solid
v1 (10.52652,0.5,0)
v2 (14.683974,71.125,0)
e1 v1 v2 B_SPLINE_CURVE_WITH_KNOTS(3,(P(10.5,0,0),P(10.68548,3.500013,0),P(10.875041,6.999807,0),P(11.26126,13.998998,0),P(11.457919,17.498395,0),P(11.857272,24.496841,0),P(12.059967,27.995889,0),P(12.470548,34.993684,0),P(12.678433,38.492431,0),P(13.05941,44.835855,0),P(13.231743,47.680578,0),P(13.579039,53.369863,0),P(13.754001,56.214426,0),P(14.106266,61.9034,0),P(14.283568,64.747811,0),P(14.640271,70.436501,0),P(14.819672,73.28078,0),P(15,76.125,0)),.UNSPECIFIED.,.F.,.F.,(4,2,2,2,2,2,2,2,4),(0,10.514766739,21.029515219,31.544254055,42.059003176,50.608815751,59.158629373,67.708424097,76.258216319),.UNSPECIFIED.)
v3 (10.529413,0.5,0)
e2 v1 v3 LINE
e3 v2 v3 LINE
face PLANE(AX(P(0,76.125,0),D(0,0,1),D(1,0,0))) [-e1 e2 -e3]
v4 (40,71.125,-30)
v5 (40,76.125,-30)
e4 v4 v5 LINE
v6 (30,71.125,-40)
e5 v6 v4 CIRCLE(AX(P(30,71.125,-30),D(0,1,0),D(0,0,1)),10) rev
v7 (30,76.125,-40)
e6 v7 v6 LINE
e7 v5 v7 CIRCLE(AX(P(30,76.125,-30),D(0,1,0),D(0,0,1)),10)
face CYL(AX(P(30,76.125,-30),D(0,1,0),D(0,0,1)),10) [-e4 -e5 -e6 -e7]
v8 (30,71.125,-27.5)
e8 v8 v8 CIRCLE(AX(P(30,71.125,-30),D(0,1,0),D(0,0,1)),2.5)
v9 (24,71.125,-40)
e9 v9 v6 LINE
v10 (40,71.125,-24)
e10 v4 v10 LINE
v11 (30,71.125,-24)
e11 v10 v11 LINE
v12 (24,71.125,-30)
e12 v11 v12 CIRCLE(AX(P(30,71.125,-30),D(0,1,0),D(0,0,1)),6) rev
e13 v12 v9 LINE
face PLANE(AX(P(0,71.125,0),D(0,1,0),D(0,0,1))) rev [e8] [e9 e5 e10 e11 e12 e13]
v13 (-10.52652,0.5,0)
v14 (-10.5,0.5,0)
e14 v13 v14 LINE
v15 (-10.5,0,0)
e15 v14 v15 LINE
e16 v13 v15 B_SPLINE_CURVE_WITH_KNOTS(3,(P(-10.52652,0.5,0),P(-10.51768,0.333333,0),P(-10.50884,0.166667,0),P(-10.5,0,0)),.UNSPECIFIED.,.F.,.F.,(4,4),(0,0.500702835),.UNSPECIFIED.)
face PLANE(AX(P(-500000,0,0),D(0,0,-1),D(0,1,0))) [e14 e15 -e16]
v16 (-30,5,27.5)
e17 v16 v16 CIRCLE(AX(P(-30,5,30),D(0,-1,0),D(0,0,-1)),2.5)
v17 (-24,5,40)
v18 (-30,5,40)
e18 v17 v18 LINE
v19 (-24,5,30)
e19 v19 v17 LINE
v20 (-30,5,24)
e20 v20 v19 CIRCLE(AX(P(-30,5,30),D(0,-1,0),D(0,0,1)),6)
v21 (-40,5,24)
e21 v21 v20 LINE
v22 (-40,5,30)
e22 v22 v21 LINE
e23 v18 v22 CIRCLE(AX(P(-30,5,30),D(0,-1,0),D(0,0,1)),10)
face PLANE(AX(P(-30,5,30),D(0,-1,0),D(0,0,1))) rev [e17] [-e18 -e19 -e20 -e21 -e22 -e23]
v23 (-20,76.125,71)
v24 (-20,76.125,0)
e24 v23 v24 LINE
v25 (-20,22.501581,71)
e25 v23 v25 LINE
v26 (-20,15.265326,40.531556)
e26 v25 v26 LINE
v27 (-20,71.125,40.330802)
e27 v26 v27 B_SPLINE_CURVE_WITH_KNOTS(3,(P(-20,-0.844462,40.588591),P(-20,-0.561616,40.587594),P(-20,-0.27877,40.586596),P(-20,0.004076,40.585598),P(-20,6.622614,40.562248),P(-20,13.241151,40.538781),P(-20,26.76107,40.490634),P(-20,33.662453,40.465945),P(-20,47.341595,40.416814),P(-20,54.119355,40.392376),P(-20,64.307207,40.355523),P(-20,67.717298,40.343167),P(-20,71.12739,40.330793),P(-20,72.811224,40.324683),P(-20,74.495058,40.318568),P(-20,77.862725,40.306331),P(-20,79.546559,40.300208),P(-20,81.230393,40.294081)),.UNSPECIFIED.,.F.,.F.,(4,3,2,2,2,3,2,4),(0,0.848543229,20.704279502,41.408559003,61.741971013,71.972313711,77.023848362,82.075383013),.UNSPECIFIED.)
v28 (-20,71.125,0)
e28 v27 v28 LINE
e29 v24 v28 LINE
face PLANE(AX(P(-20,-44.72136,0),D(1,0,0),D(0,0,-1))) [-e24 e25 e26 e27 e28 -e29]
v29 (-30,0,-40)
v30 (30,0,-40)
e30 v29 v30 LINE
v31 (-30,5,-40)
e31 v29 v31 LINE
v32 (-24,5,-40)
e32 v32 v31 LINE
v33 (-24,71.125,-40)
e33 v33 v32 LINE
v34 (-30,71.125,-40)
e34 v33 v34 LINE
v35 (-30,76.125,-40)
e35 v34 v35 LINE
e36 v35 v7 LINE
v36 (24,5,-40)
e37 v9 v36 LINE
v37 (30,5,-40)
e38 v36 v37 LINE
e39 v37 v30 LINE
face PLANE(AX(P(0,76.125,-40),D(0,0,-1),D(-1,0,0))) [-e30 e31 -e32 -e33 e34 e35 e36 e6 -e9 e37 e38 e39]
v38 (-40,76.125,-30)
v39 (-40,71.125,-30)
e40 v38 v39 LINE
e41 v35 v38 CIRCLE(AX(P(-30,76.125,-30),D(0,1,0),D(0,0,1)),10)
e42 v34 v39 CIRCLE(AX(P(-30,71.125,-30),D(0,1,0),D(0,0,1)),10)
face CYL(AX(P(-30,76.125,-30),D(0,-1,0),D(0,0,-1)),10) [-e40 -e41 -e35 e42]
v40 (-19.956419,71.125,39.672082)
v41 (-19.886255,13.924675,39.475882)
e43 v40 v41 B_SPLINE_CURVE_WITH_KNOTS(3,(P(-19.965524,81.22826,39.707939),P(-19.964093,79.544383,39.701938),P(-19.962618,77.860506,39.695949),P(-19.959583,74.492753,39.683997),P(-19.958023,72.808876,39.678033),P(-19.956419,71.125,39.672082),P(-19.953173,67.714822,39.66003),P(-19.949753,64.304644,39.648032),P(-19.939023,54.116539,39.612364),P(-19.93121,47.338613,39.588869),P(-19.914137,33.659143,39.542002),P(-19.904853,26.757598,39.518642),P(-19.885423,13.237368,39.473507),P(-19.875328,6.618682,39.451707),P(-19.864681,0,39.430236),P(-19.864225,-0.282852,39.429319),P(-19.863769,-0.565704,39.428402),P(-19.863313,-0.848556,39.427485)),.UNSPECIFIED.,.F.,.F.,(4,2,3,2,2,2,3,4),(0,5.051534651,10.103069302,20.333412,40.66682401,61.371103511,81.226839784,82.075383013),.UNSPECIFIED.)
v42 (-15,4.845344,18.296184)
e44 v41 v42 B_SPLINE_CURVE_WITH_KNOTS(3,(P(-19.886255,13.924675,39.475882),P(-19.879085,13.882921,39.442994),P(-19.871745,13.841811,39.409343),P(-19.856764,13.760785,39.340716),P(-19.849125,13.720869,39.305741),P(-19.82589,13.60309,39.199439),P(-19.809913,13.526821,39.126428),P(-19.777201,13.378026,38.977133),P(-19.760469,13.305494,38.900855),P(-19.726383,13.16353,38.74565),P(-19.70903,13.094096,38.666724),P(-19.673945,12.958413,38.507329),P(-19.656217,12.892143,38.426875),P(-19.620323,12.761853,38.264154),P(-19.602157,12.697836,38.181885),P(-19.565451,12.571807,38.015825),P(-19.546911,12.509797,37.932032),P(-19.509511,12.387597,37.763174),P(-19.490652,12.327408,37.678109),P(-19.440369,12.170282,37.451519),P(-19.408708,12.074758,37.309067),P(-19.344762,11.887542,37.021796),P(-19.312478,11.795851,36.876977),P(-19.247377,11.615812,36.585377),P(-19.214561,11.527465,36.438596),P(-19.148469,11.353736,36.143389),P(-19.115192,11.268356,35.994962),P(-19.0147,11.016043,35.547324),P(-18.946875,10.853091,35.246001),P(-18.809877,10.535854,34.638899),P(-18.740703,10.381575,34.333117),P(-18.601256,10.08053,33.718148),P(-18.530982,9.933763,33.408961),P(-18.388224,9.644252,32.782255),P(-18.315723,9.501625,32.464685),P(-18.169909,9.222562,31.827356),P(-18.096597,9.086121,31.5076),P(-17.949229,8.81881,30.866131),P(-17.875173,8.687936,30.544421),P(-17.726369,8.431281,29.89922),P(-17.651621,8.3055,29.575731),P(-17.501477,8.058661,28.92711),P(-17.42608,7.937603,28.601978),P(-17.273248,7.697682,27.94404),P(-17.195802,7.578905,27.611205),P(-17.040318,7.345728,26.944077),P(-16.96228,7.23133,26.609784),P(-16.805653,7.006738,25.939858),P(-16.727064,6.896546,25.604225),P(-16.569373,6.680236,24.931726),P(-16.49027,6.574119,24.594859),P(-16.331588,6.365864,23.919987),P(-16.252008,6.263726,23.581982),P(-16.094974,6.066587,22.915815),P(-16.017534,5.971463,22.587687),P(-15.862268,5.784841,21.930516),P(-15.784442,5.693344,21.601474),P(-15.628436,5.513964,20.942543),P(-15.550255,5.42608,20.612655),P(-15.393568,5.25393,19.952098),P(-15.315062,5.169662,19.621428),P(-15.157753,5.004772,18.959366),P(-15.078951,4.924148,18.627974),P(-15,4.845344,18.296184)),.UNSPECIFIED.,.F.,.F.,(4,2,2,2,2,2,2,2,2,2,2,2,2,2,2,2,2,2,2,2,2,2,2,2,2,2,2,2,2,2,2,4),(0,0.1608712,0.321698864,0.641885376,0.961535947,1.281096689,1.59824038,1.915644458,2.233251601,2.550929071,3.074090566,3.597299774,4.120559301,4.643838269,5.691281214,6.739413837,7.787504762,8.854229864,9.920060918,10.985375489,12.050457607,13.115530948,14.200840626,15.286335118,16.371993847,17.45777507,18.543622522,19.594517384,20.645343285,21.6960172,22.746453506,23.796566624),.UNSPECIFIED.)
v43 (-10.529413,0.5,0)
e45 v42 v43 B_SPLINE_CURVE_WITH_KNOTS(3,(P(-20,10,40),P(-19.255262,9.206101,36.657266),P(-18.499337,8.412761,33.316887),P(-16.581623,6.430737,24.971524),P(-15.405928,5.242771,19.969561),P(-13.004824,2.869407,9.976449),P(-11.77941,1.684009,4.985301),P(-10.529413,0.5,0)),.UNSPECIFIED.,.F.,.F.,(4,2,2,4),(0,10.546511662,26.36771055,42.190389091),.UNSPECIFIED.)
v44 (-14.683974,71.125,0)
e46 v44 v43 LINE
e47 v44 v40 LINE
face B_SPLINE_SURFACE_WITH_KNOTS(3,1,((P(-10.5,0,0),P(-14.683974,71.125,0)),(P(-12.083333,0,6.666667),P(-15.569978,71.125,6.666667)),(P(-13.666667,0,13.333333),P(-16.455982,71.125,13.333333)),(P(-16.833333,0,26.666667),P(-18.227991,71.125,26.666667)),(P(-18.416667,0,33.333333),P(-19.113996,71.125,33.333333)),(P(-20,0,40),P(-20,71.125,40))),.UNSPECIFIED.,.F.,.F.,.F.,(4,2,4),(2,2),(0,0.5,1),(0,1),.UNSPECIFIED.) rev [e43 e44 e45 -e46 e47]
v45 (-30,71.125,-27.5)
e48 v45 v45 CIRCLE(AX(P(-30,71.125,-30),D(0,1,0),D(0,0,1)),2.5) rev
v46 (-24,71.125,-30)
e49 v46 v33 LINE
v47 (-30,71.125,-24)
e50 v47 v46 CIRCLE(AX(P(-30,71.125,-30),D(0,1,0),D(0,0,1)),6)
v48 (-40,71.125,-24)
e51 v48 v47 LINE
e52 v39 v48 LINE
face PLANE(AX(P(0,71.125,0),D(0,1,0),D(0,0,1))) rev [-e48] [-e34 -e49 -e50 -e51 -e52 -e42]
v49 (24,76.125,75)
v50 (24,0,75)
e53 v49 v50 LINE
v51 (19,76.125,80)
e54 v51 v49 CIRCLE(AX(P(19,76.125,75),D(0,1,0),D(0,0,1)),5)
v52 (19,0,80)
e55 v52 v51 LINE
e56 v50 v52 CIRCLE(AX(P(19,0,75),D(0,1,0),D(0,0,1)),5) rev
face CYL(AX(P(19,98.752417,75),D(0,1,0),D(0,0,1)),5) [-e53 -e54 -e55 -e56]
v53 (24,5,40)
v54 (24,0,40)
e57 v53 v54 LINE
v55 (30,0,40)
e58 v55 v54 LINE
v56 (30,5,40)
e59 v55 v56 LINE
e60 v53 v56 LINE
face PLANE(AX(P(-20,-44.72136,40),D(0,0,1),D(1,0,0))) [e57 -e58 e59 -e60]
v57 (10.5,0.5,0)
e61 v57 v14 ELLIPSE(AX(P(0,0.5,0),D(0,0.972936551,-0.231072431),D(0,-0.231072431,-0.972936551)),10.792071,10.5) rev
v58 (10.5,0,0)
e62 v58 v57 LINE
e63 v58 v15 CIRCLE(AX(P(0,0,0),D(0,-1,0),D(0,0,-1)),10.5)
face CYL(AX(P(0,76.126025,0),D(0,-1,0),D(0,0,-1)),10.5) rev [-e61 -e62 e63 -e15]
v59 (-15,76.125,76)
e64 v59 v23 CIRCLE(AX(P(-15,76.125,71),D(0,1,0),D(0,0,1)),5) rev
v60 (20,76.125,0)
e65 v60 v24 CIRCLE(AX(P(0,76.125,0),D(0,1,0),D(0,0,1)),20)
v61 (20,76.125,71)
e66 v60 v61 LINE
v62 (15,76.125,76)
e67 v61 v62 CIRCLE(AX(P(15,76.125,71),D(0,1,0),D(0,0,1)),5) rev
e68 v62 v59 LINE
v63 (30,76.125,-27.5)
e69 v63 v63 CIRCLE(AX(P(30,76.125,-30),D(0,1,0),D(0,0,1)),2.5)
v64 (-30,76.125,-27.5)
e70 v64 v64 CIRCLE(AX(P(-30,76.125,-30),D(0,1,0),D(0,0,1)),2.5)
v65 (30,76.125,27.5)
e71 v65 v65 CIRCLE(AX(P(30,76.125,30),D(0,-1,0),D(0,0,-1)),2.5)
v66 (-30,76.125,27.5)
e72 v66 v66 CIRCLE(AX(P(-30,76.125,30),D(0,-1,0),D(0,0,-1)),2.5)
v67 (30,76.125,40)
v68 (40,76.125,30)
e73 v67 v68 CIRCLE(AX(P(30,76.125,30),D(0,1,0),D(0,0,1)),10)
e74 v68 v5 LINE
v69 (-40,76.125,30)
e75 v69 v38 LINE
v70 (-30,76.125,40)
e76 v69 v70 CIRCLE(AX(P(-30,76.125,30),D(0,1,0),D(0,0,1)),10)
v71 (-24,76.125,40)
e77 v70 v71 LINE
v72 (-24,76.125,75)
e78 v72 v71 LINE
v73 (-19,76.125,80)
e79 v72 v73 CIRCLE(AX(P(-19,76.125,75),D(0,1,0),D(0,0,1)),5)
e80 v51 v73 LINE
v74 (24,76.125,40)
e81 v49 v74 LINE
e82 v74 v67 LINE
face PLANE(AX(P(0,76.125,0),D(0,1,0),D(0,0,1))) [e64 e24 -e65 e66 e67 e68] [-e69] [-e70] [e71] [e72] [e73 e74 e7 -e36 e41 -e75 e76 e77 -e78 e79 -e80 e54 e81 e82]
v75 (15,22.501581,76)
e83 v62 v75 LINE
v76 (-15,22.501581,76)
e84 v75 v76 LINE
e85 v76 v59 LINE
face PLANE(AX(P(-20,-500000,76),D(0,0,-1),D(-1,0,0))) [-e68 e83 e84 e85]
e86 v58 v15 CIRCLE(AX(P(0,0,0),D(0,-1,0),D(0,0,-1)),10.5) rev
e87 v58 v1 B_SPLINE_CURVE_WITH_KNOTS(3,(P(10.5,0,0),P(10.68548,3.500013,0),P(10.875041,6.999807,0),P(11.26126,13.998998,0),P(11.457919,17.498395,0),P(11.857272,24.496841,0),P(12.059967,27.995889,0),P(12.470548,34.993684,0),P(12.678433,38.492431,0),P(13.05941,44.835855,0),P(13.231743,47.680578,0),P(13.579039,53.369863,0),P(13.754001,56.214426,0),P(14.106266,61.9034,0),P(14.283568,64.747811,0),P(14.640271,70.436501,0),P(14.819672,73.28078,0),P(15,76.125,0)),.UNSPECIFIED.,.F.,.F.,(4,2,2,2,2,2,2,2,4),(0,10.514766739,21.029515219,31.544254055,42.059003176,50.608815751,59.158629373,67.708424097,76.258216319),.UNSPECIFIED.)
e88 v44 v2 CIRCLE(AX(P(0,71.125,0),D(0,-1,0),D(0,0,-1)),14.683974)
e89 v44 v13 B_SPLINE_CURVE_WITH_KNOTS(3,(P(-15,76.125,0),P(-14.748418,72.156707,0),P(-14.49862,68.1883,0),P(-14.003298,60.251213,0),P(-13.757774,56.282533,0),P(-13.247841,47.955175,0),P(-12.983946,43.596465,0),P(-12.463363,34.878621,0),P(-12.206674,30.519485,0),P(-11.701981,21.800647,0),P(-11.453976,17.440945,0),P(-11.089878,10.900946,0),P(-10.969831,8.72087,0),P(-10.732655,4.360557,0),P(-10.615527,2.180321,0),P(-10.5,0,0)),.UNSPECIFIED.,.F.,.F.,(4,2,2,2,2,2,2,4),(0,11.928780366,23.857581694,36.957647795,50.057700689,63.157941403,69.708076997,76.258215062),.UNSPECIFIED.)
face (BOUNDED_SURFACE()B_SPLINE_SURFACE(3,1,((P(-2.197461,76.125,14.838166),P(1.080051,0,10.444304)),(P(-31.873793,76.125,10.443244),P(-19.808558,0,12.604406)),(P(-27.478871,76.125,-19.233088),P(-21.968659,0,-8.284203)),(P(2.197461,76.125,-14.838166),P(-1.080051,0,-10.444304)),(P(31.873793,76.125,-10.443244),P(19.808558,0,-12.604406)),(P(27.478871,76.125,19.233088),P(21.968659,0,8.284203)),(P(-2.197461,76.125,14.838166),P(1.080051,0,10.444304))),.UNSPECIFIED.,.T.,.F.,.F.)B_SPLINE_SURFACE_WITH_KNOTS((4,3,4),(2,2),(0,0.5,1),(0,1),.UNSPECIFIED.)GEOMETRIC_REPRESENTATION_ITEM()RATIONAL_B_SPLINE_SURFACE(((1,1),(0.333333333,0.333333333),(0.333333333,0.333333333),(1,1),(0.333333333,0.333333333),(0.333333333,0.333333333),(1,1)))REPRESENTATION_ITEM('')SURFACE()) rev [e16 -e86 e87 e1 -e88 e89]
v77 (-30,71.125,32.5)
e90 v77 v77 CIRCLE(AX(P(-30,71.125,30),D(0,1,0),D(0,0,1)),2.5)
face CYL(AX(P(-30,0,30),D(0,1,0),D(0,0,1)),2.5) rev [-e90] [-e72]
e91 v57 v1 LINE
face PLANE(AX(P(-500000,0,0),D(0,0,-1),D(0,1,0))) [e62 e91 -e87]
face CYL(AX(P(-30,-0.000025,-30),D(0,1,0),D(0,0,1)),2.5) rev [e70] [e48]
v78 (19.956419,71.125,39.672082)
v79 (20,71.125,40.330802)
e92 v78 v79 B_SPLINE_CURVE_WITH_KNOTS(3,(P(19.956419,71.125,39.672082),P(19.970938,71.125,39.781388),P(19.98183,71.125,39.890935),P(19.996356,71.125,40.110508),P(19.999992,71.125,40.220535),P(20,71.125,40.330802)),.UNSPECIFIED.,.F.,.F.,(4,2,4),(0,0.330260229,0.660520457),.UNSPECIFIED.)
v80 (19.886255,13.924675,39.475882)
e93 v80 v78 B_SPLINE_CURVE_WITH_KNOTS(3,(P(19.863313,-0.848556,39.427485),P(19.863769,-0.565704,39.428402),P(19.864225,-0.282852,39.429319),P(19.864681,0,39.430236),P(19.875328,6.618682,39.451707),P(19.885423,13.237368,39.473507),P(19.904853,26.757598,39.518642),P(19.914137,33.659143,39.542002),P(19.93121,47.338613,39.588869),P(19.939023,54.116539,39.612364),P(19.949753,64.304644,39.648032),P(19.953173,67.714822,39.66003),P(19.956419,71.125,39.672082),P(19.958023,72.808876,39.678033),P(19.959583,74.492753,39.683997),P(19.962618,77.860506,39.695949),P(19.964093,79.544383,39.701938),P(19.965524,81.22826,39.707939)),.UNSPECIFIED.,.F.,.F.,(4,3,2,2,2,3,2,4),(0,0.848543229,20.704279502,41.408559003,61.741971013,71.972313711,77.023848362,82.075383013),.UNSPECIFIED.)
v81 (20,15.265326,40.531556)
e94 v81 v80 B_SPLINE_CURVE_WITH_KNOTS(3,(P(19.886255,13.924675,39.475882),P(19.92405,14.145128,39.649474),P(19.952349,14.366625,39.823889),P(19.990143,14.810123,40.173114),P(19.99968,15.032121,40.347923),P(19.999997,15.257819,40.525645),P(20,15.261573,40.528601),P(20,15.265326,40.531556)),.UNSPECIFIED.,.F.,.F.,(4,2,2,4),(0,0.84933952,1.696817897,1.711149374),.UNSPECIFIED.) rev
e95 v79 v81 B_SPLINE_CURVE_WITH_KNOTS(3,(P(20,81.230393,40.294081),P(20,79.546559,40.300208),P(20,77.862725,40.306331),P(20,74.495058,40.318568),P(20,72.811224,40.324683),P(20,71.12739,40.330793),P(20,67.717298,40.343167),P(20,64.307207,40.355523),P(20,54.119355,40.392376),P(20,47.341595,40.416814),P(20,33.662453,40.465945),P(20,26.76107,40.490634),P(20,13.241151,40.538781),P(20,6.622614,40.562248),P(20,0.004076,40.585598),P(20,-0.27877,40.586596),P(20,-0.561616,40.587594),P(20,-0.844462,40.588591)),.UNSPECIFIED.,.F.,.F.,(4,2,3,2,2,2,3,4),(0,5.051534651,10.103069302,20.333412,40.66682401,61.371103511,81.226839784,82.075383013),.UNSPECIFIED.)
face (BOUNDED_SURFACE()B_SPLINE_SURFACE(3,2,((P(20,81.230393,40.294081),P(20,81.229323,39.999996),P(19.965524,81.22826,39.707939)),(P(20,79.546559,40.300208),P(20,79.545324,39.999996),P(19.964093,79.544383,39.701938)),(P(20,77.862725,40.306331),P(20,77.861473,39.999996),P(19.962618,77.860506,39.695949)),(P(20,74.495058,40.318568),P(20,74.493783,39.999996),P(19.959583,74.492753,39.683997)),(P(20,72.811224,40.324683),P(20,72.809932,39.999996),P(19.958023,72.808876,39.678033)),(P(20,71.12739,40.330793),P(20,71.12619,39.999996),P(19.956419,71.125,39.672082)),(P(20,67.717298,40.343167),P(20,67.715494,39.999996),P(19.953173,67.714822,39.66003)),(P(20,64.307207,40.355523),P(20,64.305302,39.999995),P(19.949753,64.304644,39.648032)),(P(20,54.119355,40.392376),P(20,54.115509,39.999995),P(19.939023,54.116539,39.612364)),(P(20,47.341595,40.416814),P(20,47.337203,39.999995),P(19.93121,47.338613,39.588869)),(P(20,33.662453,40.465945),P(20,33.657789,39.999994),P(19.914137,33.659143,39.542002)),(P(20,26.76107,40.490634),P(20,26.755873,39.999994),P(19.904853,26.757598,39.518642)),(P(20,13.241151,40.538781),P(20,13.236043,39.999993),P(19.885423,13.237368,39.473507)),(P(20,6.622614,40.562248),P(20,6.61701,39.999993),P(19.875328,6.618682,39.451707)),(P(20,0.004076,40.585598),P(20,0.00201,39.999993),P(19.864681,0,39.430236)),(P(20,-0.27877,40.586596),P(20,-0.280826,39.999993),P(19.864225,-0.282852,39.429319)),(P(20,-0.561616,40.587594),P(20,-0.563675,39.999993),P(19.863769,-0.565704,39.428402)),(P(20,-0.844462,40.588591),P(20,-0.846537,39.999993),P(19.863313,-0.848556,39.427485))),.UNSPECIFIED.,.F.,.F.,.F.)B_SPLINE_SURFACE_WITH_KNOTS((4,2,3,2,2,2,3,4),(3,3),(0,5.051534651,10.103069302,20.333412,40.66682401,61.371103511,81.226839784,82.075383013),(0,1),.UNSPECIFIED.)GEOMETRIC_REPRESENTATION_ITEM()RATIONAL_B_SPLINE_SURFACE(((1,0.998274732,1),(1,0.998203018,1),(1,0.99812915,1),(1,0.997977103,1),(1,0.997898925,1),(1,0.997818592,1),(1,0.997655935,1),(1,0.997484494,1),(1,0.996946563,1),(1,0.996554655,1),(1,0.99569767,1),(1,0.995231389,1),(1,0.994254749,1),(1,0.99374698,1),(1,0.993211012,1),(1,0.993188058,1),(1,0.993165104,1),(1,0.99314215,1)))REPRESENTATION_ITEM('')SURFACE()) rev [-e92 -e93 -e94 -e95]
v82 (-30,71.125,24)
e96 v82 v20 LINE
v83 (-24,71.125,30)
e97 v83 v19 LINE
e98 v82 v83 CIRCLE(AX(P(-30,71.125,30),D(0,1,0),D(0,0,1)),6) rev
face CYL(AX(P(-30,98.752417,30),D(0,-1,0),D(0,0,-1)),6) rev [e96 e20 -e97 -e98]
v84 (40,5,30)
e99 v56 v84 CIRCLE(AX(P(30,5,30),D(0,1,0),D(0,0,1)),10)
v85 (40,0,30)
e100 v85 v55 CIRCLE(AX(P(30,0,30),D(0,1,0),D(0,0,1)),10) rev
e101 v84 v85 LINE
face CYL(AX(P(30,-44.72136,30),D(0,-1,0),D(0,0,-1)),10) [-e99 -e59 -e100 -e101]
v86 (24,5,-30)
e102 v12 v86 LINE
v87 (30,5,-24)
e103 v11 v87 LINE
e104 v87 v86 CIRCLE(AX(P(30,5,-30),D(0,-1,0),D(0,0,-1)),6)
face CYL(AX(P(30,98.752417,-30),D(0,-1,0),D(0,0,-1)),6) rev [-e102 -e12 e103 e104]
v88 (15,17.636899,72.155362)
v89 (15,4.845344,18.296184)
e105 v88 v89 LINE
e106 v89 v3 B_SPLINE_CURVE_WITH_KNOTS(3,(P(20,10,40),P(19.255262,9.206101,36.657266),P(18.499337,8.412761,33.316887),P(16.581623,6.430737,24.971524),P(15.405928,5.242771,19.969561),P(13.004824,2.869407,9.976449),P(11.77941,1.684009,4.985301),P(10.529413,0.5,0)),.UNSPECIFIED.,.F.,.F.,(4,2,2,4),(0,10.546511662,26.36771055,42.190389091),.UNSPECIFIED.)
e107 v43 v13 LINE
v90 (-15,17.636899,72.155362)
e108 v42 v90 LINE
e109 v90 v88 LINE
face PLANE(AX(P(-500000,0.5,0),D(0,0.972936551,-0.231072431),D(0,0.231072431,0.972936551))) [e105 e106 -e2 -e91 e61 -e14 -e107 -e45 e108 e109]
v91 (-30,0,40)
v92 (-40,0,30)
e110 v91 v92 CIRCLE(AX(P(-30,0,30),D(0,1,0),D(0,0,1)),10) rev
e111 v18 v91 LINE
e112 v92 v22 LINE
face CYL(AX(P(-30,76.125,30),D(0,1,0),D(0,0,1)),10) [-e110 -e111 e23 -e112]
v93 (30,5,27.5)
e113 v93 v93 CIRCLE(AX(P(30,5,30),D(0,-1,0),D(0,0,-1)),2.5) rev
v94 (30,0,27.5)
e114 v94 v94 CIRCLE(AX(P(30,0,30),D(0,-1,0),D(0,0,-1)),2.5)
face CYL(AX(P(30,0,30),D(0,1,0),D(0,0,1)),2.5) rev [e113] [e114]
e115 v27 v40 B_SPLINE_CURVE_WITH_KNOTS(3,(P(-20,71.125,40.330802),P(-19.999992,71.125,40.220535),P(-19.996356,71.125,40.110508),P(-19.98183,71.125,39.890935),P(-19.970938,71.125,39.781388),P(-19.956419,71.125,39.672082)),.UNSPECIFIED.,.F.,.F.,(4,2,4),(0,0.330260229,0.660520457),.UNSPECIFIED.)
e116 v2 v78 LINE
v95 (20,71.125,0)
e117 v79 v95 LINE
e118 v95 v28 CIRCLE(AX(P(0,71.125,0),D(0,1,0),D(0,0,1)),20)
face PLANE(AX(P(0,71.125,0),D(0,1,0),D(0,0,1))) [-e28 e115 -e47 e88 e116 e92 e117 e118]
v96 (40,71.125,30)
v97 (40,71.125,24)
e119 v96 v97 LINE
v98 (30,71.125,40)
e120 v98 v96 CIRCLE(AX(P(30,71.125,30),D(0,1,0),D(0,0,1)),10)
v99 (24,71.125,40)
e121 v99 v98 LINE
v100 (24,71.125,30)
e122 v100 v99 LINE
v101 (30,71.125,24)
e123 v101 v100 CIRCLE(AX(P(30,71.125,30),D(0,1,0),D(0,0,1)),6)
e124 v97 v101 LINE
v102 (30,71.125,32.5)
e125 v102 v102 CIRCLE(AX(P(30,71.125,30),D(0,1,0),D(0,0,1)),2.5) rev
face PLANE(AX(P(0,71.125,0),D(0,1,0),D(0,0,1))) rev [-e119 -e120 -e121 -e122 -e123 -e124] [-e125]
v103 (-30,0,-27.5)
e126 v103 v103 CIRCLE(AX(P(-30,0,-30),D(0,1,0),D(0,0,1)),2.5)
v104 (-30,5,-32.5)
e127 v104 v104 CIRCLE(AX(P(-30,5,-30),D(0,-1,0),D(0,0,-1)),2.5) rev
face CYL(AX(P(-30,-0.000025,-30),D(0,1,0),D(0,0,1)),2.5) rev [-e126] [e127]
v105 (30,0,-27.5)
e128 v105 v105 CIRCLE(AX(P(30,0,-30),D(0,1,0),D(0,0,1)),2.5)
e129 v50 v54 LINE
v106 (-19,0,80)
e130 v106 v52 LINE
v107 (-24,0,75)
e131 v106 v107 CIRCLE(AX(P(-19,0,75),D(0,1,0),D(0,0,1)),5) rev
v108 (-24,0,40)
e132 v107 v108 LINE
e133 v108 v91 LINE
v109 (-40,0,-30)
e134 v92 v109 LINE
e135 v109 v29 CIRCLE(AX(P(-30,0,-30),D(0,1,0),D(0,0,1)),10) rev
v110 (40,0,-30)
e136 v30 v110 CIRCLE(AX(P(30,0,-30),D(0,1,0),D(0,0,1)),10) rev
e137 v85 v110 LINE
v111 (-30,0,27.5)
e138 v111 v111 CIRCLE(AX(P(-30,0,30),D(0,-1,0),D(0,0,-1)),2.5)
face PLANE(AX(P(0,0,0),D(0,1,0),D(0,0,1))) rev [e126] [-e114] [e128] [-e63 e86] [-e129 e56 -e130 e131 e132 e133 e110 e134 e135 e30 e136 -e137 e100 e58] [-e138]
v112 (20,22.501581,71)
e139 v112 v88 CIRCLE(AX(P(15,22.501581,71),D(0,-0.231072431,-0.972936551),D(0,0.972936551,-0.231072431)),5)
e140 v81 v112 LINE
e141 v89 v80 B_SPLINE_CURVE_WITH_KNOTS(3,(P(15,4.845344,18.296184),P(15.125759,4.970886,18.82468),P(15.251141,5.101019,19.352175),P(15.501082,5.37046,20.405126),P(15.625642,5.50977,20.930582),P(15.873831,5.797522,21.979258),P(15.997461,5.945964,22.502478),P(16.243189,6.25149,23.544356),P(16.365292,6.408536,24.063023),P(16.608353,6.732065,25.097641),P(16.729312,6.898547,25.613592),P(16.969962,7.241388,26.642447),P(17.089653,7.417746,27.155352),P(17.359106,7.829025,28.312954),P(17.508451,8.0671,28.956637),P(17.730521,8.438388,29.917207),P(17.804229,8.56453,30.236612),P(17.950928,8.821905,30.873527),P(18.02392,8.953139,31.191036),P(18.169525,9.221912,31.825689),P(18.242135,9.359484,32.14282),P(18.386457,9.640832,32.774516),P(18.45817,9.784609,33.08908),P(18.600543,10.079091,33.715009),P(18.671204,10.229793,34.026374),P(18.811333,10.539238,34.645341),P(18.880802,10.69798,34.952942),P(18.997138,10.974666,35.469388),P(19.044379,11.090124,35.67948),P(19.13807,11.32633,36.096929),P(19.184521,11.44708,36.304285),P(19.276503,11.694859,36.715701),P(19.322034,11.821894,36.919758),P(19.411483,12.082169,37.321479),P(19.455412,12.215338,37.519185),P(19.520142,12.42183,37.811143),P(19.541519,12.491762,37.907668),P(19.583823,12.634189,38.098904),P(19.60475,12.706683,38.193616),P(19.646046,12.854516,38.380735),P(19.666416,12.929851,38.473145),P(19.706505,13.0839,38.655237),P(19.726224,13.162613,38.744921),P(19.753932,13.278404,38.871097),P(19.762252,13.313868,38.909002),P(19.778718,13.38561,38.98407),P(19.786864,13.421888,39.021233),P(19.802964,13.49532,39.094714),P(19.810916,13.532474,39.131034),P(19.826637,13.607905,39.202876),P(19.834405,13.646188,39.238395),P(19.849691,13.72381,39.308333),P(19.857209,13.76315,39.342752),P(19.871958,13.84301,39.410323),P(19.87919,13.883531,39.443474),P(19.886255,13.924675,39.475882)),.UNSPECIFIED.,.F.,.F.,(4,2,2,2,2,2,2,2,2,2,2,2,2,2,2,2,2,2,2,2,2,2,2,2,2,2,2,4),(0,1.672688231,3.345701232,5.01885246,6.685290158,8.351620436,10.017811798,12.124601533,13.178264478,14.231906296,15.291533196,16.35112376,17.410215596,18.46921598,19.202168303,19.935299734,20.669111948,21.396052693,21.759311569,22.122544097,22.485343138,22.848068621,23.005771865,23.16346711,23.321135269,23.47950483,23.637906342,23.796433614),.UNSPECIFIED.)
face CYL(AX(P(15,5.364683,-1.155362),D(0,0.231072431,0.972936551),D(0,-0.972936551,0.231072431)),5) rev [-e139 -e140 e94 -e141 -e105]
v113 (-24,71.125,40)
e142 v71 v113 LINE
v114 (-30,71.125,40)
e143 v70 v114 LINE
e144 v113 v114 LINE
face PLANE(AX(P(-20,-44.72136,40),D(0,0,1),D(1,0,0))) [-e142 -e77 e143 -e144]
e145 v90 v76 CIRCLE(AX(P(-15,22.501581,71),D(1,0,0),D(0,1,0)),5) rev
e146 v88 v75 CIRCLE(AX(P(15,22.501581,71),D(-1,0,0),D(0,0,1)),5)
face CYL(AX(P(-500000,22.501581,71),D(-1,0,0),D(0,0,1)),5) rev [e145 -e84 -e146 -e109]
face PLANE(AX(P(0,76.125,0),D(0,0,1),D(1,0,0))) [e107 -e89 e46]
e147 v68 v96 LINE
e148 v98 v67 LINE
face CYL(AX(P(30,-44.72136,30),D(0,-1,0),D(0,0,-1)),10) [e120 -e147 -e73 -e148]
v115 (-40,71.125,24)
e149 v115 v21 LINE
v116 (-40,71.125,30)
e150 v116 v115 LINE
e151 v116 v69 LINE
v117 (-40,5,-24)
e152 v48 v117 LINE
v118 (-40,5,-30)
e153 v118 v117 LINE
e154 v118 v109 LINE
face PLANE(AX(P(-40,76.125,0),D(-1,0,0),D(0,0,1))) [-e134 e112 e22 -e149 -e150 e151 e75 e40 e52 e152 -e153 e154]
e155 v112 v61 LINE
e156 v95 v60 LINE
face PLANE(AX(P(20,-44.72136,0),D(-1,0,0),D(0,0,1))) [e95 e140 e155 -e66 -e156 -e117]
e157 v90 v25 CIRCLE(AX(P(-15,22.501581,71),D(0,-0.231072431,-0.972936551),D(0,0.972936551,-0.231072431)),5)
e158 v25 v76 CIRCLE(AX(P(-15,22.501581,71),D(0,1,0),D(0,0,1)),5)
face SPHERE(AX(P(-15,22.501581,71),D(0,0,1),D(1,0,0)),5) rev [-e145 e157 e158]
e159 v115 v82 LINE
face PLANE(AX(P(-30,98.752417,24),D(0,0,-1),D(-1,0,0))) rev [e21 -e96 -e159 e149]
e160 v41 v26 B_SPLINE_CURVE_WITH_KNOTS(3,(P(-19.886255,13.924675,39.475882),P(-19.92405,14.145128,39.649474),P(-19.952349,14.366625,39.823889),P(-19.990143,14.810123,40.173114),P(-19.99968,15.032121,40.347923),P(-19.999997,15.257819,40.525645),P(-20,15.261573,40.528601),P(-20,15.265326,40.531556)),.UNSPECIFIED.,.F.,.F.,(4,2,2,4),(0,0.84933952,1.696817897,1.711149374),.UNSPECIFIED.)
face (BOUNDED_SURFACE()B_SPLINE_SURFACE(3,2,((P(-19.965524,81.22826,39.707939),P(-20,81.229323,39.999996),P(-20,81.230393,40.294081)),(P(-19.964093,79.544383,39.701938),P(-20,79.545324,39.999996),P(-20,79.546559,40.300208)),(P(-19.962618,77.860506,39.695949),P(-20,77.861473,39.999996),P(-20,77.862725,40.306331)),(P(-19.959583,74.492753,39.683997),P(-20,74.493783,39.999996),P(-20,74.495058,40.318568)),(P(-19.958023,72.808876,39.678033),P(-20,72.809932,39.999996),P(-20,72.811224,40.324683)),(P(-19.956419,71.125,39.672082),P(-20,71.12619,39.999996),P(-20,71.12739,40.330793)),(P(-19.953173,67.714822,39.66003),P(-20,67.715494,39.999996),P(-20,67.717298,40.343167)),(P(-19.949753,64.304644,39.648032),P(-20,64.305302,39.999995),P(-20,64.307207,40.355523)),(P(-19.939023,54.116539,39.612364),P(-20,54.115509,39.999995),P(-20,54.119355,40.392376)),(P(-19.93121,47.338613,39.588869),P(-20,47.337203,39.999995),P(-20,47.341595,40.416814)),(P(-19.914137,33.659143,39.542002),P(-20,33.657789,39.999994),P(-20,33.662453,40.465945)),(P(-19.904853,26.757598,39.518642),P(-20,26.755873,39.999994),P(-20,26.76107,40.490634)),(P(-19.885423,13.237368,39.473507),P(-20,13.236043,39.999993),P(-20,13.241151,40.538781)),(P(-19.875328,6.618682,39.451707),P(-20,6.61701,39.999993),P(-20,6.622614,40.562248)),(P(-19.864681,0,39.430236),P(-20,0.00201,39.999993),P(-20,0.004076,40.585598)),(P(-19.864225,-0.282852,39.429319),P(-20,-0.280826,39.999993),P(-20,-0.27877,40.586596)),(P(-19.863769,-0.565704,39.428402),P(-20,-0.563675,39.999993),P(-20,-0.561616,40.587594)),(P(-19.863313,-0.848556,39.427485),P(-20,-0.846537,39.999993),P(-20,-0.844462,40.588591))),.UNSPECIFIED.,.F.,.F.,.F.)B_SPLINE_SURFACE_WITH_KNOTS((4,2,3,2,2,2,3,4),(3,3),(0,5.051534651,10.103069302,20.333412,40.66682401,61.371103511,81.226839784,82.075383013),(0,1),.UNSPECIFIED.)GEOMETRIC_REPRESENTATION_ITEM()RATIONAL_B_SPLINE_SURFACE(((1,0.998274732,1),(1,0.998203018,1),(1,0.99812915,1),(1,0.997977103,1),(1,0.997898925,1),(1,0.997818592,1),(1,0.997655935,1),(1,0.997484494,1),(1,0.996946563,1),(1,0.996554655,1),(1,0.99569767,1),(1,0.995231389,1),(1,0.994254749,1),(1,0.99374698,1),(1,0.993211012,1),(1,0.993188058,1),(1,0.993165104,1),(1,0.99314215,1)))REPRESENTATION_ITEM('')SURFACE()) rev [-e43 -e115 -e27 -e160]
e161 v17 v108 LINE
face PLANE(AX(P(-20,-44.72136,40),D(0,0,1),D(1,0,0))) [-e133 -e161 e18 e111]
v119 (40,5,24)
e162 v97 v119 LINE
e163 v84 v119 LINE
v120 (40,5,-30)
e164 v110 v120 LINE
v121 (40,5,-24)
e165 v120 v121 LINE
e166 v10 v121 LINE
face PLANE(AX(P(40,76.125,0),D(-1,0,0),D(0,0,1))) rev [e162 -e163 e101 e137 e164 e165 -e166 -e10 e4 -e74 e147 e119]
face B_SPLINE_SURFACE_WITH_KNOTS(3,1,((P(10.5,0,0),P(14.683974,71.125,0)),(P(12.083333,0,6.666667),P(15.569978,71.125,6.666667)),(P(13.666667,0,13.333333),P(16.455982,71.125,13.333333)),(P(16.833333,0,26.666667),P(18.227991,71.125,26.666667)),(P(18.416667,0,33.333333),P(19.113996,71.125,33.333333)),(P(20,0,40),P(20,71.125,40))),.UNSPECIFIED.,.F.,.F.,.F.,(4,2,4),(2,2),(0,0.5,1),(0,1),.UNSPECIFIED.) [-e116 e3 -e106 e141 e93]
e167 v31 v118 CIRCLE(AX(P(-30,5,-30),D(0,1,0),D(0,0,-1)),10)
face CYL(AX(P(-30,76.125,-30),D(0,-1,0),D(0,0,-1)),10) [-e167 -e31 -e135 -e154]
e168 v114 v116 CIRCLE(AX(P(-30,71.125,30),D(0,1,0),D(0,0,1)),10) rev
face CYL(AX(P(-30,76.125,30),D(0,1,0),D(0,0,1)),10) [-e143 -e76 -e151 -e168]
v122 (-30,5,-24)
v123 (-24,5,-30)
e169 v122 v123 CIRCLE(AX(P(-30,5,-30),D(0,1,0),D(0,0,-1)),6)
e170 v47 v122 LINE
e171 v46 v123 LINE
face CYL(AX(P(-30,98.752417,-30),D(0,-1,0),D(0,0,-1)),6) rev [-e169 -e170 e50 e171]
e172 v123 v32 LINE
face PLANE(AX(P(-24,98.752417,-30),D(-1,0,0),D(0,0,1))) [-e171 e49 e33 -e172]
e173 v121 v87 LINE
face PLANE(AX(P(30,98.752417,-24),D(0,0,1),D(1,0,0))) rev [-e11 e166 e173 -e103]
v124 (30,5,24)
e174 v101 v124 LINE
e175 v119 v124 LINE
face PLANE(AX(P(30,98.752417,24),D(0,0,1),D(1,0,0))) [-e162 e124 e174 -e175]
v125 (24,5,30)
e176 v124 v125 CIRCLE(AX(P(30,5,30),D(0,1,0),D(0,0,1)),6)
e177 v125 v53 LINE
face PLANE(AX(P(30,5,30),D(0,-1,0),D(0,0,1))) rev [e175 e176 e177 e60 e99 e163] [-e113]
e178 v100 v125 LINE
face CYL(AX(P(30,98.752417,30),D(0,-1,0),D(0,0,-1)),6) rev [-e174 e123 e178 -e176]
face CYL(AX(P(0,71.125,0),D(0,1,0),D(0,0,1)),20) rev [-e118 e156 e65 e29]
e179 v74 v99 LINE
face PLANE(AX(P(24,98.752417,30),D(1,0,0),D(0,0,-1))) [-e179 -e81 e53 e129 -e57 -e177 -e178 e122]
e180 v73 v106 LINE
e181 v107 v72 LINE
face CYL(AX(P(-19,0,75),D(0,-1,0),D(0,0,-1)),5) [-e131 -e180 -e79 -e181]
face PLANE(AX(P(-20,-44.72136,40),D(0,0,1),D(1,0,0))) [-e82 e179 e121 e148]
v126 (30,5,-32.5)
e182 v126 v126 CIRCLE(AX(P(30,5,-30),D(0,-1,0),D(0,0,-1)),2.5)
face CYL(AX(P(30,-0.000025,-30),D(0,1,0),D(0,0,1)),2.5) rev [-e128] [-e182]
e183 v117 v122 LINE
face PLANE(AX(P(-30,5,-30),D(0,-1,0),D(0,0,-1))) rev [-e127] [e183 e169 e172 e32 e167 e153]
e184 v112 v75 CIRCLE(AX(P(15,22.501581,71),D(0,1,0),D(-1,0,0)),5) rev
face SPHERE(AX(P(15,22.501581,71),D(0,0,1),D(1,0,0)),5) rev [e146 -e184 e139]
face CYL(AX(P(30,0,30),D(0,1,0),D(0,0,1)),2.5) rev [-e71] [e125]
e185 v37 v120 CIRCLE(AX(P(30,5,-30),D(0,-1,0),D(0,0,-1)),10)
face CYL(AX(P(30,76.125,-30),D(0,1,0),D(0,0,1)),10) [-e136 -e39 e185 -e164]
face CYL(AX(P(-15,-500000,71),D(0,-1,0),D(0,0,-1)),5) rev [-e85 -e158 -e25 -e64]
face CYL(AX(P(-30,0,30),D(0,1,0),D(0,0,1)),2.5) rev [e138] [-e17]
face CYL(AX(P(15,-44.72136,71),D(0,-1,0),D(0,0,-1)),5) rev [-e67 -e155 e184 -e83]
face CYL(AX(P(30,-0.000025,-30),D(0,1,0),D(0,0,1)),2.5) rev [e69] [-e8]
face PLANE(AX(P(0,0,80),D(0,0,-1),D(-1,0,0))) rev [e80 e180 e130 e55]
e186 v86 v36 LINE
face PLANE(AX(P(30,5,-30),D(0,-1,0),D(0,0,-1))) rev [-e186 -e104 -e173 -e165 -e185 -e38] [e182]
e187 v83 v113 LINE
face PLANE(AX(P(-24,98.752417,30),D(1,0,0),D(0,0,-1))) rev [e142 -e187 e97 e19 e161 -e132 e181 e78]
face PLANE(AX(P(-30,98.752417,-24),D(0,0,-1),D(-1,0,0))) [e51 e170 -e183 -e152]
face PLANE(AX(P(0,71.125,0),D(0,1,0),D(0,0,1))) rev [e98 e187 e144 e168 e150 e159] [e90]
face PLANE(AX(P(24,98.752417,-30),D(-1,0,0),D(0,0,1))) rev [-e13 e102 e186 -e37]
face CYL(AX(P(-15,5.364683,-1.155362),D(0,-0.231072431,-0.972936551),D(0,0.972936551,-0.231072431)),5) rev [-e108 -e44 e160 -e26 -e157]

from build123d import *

# Parameters (mm, degrees)
SKETCH1_W                       = 80
SKETCH1_H                       = 40
BOSS_EXTRUDE1_DEPTH             = 76.125
FILLET1_R                       = 10
CUT_EXTRUDE1_START              = -66.125
CUT_EXTRUDE1_DEPTH              = 66.125
SKETCH5_R                       = 2.5
CUT_EXTRUDE2_DEPTH              = 95.842056369
SKETCH6_R                       = 20
CUT_EXTRUDE3_DEPTH              = 5
SKETCH7_W                       = 20
SKETCH7_H                       = 40
BOSS_EXTRUDE3_DEPTH             = 76.125
FILLET2_R                       = 10
MIRROR2_START                   = -66.125
MIRROR2_COPY_1_DEPTH            = 66.125
BOSS_EXTRUDE4_REACH             = 96.842
BOSS_EXTRUDE4_DIRECTION_2_REACH = 96.842
CUT_EXTRUDE4_REACH              = 96.842
SKETCH12_R                      = 10.5
SKETCH13_W                      = 4
SKETCH13_H                      = 76.125
BOSS_EXTRUDE5_DEPTH             = 40
BOSS_EXTRUDE6_REACH             = 127.678
BOSS_EXTRUDE7_REACH             = 119.452
SKETCH15_W                      = 40
SKETCH15_H                      = 4
FILLET3_R                       = 5


with BuildPart() as part:
    # Sketch1 → Boss-Extrude1 (new body)
    with BuildSketch(Plane(origin=(0, 0, 0), x_dir=(1, 0, 0), z_dir=(0, 1, 0))):
        with Locations((0, 20)):
            Rectangle(SKETCH1_W, SKETCH1_H)
    extrude(amount=BOSS_EXTRUDE1_DEPTH)

    # Cut-Loft1: read off the stored shape, not the designer's step
    # Cut-Loft1: loft between two sections, ruled curve by curve
    cut_loft1_from = [
        Edge.make_bspline([(-2.197461017, 76.125, 14.838165826), (-31.873792669, 76.125, 10.443243791), (-27.478870634, 76.125, -19.233087861), (2.197461017, 76.125, -14.838165826), (31.873792669, 76.125, -10.443243791), (27.478870634, 76.125, 19.233087861), (-2.197461017, 76.125, 14.838165826)], [0, 0, 0, 0, 0.5, 0.5, 0.5, 1, 1, 1, 1], 3, [1, 0.333333333, 0.333333333, 1, 0.333333333, 0.333333333, 1]),
    ]
    cut_loft1_to = [
        Edge.make_bspline([(1.080050789, 0, 10.444304203), (-19.808557618, 0, 12.604405781), (-21.968659196, 0, -8.284202626), (-1.080050789, 0, -10.444304203), (19.808557618, 0, -12.604405781), (21.968659196, 0, 8.284202626), (1.080050789, 0, 10.444304203)], [0, 0, 0, 0, 0.5, 0.5, 0.5, 1, 1, 1, 1], 3, [1, 0.333333333, 0.333333333, 1, 0.333333333, 0.333333333, 1]),
    ]
    cut_loft1 = Solid(Shell([*[Face.make_surface_from_curves(cut_loft1_from[k], cut_loft1_to[k]) for k in range(1)], Face(Wire(cut_loft1_from)), Face(Wire(cut_loft1_to))]))
    add(cut_loft1, mode=Mode.SUBTRACT)

    # Fillet1
    fillet1_edges = [part.edges().sort_by_distance(p)[0] for p in [
        (-40, 38.0625, -40),
        (40, 38.0625, -40),
    ]]
    fillet(fillet1_edges, radius=FILLET1_R)

    # Sketch4 → Cut-Extrude1 (cut)
    with BuildSketch(Plane(origin=(0, 5, 0), x_dir=(-1, 0, 0), z_dir=(0, -1, 0)).offset(CUT_EXTRUDE1_START)):
        with BuildLine():
            Line((-40, 24), (-40, 30))
            ThreePointArc((-40, 30), (-37.071067812, 37.071067812), (-30, 40))
            Line((-30, 40), (-24, 40))
            Line((-24, 40), (-24, 30))
            ThreePointArc((-24, 30), (-25.757359313, 25.757359313), (-30, 24))
            Line((-30, 24), (-40, 24))
        make_face()
    cut_extrude1 = extrude(amount=CUT_EXTRUDE1_DEPTH, mode=Mode.SUBTRACT)

    # Sketch5 → Cut-Extrude2 (cut, through all)
    with BuildSketch(Plane(origin=(0, 76.125, 0), x_dir=(1, 0, 0), z_dir=(0, 1, 0))):
        with Locations(Location((30, 30, 0), (0, 0, 270))):
            Circle(SKETCH5_R)
        with Locations(Location((-30, 30, 0), (0, 0, 270))):
            Circle(SKETCH5_R)
    cut_extrude2 = extrude(amount=-CUT_EXTRUDE2_DEPTH, mode=Mode.SUBTRACT)

    # Sketch6 → Cut-Extrude3 (cut)
    with BuildSketch(Plane(origin=(0, 76.125, 0), x_dir=(1, 0, 0), z_dir=(0, 1, 0))):
        Circle(SKETCH6_R)
    extrude(amount=-CUT_EXTRUDE3_DEPTH, mode=Mode.SUBTRACT)

    # Mirror1: Cut-Extrude1 across plane
    add(cut_extrude1.mirror(Plane(origin=(0, 0, 0), x_dir=(0, 0, 1), z_dir=(1, 0, 0))), mode=Mode.SUBTRACT)

    # Sketch7 → Boss-Extrude3 (add)
    with BuildSketch(Plane(origin=(0, 76.125, 0), x_dir=(1, 0, 0), z_dir=(0, 1, 0))):
        with Locations((-30, -20)):
            Rectangle(SKETCH7_W, SKETCH7_H)
        with Locations((30, -20)):
            Rectangle(SKETCH7_W, SKETCH7_H)
    extrude(amount=-BOSS_EXTRUDE3_DEPTH)

    # Fillet2
    fillet2_edges = [part.edges().sort_by_distance(p)[0] for p in [
        (-40, 38.0625, 40),
        (40, 38.0625, 40),
    ]]
    fillet(fillet2_edges, radius=FILLET2_R)

    # Mirror2: Cut-Extrude1, Cut-Extrude2 across plane
    add(cut_extrude1.mirror(Plane.XY), mode=Mode.SUBTRACT)
    add(cut_extrude2.mirror(Plane.XY), mode=Mode.SUBTRACT)

    # Mirror2 copy 1 sketch → Mirror2 copy 1 (cut)
    with BuildSketch(Plane.XZ.offset(-5).offset(MIRROR2_START)):
        with BuildLine():
            Line((-40, 24), (-40, 30))
            ThreePointArc((-40, 30), (-37.071067812, 37.071067812), (-30, 40))
            Line((-30, 40), (-24, 40))
            Line((-24, 40), (-24, 30))
            ThreePointArc((-24, 30), (-25.757359313, 25.757359313), (-30, 24))
            Line((-30, 24), (-40, 24))
        make_face()
    extrude(amount=MIRROR2_COPY_1_DEPTH, mode=Mode.SUBTRACT)

    # Sketch9 → Loft1 section 0
    with BuildSketch(Plane.XZ):
        with BuildLine():
            Line((20, 40), (20, 0))
            Line((20, 0), (10.5, 0))
            Line((10.5, 0), (20, 40))
        make_face()
    # Sketch8 → Loft1 section 1
    with BuildSketch(Plane(origin=(0, 71.125, 0), x_dir=(1, 0, 0), z_dir=(0, 1, 0))):
        with BuildLine():
            Line((14.683973591, 0), (20, -40))
            Line((20, -40), (20, 0))
            Line((20, 0), (14.683973591, 0))
        make_face()
    loft1 = loft()

    # Mirror3: Loft1 across plane
    add(loft1.mirror(Plane(origin=(0, 0, 0), x_dir=(0, 0, 1), z_dir=(1, 0, 0))))

    # Sketch11 → Boss-Extrude4 (add, up to next)
    with BuildSketch(Plane(origin=(0, 0, 0), x_dir=(0, 0, -1), z_dir=(1, 0, 0)), mode=Mode.PRIVATE) as boss_extrude4_sk1:
        Polygon((0, 0), (-40, 0), (-40, 10), (0, 0.5), align=None)
    boss_extrude4_tool1 = extrude(boss_extrude4_sk1.sketch, amount=BOSS_EXTRUDE4_REACH, mode=Mode.PRIVATE) - part.part
    add(boss_extrude4_tool1.solids().sort_by_distance((0, 3.34127, 26.031746))[0])

    # Sketch11 → Boss-Extrude4 direction 2 (add, up to next)
    with BuildSketch(Plane(origin=(0, 0, 0), x_dir=(0, 0, -1), z_dir=(1, 0, 0)), mode=Mode.PRIVATE) as boss_extrude4_direction_2_sk1:
        Polygon((0, 0), (-40, 0), (-40, 10), (0, 0.5), align=None)
    boss_extrude4_direction_2_tool1 = extrude(boss_extrude4_direction_2_sk1.sketch, amount=-BOSS_EXTRUDE4_DIRECTION_2_REACH, mode=Mode.PRIVATE) - part.part
    add(boss_extrude4_direction_2_tool1.solids().sort_by_distance((0, 3.34127, 26.031746))[0])

    # Sketch12 → Cut-Extrude4 (cut, up to next)
    with BuildSketch(Plane(origin=(0, 0, 0), x_dir=(-1, 0, 0), z_dir=(0, -1, 0)), mode=Mode.PRIVATE) as cut_extrude4_sk1:
        Circle(SKETCH12_R)
    cut_extrude4_tool1 = extrude(cut_extrude4_sk1.sketch, amount=-CUT_EXTRUDE4_REACH, mode=Mode.PRIVATE) & part.part
    add(cut_extrude4_tool1.solids().sort_by_distance((0, 0, 0))[0], mode=Mode.SUBTRACT)

    # Sketch13 → Boss-Extrude5 (add)
    with BuildSketch(Plane.XY.offset(40)):
        with Locations((-22, 38.0625)):
            Rectangle(SKETCH13_W, SKETCH13_H)
    boss_extrude5 = extrude(amount=BOSS_EXTRUDE5_DEPTH)

    # Mirror4: Boss-Extrude5 across plane
    add(boss_extrude5.mirror(Plane(origin=(0, 0, 0), x_dir=(0, 0, 1), z_dir=(1, 0, 0))))

    # Sketch14 → Boss-Extrude6 (add, up to next)
    with BuildSketch(Plane(origin=(-20, 0, 0), x_dir=(0, 0, -1), z_dir=(1, 0, 0)), mode=Mode.PRIVATE) as boss_extrude6_sk1:
        Polygon((-40, 10), (-80, 19.5), (-80, 0), (-40, 0), align=None)
    boss_extrude6_tool1 = extrude(boss_extrude6_sk1.sketch, amount=BOSS_EXTRUDE6_REACH, mode=Mode.PRIVATE) - part.part
    add(boss_extrude6_tool1.solids().sort_by_distance((-20, 7.629944, 62.146893))[0])

    # Boss-Extrude7: up to this plane
    boss_extrude7_end = Plane(origin=(-500000, 0.5, 0), z_dir=(0, 0.9729365507195606, -0.23107243079589554))
    # Sketch15 → Boss-Extrude7 (add, up to the surface)
    with BuildSketch(Plane(origin=(0, 76.125, 0), x_dir=(1, 0, 0), z_dir=(0, 1, 0)), mode=Mode.PRIVATE) as boss_extrude7_sk1:
        with Locations((0, -78)):
            Rectangle(SKETCH15_W, SKETCH15_H)
    boss_extrude7_tool1 = split(extrude(boss_extrude7_sk1.sketch, amount=-BOSS_EXTRUDE7_REACH, mode=Mode.PRIVATE), bisect_by=boss_extrude7_end, keep=Keep.BOTH, mode=Mode.PRIVATE)
    add(boss_extrude7_tool1.solids().sort_by_distance((0, 76.125, 78))[0])

    # Fillet3
    fillet3_edges = [part.edges().sort_by_distance(p)[0] for p in [
        (-20, 40.5625, 40),
        (20, 40.5625, 40),
        (-24, 38.0625, 80),
        (24, 38.0625, 80),
        (-20, 14.275, 58),
        (20, 14.275, 58),
        (0, 18.55, 76),
        (-20, 47.3375, 76),
        (20, 47.3375, 76),
    ]]
    fillet(fillet3_edges, radius=FILLET3_R)


solid = part.part
